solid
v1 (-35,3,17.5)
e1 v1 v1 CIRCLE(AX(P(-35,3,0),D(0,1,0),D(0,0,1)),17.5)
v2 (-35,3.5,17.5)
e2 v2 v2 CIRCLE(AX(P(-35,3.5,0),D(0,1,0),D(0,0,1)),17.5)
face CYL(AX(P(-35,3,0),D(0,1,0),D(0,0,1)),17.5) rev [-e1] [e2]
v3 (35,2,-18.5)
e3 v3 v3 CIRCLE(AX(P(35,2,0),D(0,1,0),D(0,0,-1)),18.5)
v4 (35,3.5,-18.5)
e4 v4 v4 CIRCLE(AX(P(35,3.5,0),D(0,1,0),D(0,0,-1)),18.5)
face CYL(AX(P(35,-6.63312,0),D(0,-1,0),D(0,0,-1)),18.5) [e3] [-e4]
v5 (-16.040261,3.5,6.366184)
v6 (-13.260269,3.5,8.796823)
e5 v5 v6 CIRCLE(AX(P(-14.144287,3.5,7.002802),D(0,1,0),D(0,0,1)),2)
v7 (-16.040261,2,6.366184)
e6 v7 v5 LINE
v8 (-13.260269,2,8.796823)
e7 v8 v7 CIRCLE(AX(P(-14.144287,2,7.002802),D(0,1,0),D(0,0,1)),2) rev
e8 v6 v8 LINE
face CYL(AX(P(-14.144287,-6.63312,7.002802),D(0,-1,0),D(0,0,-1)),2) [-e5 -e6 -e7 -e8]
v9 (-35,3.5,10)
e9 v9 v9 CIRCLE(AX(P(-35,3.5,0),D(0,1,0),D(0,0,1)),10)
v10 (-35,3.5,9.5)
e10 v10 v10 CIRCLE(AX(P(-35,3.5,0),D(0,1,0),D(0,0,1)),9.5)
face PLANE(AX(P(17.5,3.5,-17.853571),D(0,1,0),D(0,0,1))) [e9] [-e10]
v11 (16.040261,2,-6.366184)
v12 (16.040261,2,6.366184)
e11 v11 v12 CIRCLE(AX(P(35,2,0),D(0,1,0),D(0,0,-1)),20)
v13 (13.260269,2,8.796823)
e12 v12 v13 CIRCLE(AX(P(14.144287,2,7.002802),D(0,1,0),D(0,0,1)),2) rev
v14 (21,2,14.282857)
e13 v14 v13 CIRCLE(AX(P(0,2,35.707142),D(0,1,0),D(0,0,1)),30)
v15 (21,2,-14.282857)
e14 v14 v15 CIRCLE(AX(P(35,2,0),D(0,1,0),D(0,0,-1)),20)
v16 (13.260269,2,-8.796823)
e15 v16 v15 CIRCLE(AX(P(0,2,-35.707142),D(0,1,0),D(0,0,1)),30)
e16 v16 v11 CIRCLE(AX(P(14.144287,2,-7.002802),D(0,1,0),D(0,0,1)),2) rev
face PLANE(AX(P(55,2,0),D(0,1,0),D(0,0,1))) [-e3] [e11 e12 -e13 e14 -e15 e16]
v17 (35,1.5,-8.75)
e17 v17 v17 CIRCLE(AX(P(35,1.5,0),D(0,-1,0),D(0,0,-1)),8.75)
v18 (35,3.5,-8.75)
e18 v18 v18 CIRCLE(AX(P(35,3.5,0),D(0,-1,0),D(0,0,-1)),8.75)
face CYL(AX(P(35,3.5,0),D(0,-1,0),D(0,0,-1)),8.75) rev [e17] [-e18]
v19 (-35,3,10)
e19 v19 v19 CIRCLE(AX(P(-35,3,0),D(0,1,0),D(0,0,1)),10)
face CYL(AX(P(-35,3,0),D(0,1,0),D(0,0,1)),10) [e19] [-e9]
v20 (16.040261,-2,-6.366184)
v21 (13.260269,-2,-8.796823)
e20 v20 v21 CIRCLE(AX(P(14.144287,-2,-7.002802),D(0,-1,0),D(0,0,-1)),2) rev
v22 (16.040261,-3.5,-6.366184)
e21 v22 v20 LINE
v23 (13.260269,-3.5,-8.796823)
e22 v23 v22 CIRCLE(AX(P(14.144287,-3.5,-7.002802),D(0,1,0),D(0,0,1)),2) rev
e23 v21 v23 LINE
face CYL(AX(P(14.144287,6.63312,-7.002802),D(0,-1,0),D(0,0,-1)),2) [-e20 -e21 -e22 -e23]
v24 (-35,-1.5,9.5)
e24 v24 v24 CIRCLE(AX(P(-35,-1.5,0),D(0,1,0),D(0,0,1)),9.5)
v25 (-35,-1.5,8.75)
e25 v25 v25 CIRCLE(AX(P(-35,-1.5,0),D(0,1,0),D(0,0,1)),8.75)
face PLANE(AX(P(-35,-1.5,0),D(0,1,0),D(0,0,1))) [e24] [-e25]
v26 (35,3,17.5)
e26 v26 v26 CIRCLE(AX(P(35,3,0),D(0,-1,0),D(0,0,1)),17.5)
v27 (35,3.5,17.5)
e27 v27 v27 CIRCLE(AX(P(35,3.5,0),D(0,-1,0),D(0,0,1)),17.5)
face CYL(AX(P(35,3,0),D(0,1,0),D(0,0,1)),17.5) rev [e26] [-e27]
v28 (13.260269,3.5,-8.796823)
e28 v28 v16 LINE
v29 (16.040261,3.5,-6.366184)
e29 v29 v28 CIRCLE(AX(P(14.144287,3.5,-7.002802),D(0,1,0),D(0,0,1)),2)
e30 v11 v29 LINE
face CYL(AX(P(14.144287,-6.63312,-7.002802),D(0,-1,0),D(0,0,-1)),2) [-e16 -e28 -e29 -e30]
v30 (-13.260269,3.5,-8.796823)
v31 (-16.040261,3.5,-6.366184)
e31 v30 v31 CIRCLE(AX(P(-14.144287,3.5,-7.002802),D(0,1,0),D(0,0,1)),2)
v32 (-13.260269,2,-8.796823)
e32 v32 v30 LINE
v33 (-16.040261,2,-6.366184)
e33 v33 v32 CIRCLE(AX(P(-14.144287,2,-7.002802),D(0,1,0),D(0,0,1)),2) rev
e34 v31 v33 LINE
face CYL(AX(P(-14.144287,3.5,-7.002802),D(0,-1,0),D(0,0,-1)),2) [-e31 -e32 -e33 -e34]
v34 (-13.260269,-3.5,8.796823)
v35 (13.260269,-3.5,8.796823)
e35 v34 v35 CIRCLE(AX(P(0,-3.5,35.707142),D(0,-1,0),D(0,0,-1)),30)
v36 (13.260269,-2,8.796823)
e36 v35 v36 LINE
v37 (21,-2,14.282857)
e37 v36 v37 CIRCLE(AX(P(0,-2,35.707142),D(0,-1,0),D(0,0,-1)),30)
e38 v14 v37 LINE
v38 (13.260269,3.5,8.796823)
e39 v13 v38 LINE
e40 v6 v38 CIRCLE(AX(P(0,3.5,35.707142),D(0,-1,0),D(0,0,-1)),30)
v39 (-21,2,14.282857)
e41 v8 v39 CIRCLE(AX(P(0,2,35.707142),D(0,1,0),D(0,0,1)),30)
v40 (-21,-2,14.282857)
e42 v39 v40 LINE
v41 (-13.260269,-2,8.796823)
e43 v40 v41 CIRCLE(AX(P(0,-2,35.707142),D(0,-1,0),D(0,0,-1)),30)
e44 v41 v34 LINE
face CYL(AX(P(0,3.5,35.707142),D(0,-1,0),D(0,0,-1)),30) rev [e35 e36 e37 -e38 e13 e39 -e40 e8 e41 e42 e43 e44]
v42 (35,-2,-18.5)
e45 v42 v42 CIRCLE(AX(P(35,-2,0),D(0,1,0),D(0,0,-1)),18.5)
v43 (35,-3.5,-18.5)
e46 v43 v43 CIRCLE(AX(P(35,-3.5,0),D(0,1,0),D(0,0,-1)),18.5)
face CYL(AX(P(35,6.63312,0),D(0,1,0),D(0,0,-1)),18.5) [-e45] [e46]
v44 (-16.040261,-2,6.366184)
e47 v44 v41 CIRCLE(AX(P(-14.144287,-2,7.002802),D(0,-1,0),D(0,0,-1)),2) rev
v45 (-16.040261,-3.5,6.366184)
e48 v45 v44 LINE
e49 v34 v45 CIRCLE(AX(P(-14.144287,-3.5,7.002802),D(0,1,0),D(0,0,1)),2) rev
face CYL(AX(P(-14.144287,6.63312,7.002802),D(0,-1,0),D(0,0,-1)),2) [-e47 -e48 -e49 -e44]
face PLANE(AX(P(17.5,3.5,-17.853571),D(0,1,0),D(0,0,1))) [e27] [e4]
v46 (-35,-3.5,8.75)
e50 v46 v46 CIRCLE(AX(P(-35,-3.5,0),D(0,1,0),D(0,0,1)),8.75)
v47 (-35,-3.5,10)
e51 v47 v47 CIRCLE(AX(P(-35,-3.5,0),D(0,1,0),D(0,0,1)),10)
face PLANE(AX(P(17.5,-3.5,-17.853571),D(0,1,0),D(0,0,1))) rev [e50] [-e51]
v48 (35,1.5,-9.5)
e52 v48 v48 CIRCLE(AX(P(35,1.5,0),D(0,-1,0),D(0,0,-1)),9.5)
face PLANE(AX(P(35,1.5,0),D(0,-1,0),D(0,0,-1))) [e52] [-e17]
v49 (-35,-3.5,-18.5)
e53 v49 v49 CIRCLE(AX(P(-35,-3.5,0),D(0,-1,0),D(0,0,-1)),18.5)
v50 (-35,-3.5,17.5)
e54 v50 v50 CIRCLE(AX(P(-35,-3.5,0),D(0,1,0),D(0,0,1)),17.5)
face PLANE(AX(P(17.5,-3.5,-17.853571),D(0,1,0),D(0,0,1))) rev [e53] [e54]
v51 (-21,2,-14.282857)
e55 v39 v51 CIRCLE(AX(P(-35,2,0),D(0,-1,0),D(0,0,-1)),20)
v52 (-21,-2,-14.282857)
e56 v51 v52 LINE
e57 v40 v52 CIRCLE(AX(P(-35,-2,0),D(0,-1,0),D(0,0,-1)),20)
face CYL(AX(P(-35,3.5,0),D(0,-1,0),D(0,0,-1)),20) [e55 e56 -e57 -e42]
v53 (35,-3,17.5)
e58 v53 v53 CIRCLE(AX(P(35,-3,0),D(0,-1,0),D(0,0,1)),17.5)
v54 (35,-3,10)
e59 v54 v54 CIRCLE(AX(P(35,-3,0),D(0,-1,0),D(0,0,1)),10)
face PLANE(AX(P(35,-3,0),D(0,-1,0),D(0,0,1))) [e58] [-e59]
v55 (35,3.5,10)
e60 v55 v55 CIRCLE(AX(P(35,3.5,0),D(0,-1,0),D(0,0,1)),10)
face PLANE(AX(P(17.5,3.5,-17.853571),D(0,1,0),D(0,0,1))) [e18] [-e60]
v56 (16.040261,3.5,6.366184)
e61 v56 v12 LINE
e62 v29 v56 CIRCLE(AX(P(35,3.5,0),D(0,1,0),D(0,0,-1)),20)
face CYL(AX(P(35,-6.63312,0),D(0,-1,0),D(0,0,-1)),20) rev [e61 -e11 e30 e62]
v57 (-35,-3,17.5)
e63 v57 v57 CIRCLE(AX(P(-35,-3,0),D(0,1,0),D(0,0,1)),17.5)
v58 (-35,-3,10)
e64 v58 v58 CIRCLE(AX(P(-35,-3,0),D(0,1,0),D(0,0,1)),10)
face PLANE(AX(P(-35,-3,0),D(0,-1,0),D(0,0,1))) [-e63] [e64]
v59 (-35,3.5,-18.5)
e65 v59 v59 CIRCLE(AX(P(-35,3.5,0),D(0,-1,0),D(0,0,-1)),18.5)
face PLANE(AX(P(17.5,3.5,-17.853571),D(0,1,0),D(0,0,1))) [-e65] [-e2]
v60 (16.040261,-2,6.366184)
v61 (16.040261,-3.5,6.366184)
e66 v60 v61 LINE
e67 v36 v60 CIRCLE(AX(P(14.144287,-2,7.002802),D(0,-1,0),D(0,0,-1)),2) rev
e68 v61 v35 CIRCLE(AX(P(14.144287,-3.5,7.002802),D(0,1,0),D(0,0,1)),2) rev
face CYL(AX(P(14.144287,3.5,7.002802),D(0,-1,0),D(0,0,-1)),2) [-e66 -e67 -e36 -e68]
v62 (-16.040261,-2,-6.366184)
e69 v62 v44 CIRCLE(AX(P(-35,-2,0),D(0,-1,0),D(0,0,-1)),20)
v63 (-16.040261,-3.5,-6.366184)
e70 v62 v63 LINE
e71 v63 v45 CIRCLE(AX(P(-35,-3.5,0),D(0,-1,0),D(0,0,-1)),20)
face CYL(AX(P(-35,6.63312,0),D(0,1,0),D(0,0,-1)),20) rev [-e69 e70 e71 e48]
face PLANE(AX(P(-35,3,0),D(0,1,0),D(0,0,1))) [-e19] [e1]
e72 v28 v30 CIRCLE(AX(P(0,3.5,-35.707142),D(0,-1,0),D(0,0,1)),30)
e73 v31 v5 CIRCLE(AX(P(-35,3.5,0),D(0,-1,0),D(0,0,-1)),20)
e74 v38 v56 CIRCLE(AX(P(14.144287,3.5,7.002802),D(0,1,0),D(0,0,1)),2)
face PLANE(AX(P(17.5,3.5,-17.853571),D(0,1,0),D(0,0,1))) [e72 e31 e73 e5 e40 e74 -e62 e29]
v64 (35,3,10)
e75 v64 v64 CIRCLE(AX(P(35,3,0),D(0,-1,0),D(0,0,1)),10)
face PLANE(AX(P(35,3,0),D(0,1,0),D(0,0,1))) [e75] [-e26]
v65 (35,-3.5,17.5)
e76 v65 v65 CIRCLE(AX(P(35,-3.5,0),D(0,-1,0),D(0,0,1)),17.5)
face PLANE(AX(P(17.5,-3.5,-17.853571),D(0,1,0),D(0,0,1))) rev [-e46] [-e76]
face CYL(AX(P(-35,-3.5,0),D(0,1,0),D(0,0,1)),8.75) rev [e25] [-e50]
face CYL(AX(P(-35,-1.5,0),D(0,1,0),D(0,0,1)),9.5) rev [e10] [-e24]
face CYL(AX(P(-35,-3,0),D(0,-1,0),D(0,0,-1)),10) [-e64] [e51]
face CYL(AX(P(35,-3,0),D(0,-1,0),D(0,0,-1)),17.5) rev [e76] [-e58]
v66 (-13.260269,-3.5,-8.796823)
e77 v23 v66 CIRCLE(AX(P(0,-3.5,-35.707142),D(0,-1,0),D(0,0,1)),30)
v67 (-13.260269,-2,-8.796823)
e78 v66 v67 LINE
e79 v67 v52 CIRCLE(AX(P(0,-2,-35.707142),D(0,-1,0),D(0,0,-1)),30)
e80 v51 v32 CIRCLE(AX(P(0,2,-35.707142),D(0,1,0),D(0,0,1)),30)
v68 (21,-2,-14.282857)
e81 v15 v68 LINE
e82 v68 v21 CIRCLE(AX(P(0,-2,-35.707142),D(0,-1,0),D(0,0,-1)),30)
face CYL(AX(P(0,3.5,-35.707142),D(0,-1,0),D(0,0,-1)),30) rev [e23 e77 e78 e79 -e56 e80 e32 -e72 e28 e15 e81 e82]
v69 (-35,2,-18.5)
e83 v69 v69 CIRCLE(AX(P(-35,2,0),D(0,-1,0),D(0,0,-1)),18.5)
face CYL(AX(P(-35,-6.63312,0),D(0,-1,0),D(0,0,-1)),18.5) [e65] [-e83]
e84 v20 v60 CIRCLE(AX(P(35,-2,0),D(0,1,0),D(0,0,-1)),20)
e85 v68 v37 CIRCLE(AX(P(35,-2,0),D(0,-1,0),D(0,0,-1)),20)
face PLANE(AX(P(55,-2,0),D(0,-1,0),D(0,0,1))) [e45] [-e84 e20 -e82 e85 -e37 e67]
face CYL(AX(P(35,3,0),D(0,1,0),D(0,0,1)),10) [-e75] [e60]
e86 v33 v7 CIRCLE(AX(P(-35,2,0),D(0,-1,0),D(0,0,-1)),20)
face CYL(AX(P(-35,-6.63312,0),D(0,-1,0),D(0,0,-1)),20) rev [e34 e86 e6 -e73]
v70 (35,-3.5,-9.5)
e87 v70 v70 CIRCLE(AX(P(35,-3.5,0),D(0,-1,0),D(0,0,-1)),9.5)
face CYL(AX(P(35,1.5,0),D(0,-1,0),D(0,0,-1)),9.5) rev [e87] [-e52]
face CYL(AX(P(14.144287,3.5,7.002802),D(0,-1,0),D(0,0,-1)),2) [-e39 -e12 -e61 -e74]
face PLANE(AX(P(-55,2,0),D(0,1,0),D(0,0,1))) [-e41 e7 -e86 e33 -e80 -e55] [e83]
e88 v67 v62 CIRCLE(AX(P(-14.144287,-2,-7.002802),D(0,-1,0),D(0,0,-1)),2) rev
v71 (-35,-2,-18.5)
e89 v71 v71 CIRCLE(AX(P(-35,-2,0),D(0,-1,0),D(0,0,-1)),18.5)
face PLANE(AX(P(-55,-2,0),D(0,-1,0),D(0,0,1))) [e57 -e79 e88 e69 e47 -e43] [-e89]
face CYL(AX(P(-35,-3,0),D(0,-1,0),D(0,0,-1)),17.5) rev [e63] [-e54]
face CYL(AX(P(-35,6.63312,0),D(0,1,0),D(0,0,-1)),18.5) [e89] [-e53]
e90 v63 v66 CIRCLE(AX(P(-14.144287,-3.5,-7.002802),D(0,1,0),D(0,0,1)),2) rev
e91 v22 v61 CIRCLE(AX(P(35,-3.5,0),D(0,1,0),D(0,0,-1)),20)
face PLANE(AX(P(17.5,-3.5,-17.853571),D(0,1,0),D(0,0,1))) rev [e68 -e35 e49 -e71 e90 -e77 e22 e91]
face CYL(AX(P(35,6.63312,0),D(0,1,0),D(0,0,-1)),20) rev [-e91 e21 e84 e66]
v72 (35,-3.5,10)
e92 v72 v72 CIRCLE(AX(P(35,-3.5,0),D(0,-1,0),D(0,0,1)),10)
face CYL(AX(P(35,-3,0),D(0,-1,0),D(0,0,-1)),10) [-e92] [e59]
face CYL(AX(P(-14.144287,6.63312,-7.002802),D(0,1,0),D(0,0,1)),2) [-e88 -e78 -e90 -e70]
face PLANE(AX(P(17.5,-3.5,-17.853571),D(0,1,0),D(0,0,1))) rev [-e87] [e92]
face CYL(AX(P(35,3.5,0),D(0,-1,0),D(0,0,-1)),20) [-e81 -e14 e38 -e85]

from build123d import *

# Parameters (mm, degrees)
BOSS_EXTRUDE1_DEPTH       = 3.5
SKETCH2_R                 = 9.5
CUT_EXTRUDE1_DEPTH        = 5
SKETCH3_R                 = 8.75
CUT_EXTRUDE2_DEPTH        = 59.736700622
SKETCH4_R                 = 9.5
CUT_EXTRUDE3_DEPTH        = 5
SKETCH5_R                 = 8.75
CUT_EXTRUDE4_DEPTH        = 59.736700622
SKETCH6_R                 = 17.5
SKETCH6_R_2               = 10
CUT_EXTRUDE5_DEPTH        = 0.5
SKETCH7_W                 = 1.5
SKETCH7_H                 = 1.5
FILLET1_START             = 2
FILLET1_DEPTH             = 2
MIRROR2_COPY_1_SKETCH_R   = 17.5
MIRROR2_COPY_1_SKETCH_R_2 = 10
MIRROR2_COPY_1_DEPTH      = 0.5
MIRROR2_COPY_2_SKETCH_W   = 1.5
MIRROR2_COPY_2_SKETCH_H   = 1.5
MIRROR2_START             = 2
MIRROR2_COPY_3_DEPTH      = 2


with BuildPart() as part:
    # Sketch1 → Boss-Extrude1 (new, symmetric)
    with BuildSketch(Plane(origin=(0, 0, 0), x_dir=(1, 0, 0), z_dir=(0, 1, 0))):
        with BuildLine():
            ThreePointArc((-21, 14.282856857), (-55, 0), (-21, -14.282856857))
            ThreePointArc((-21, -14.282856857), (0, -5.707142143), (21, -14.282856857))
            ThreePointArc((21, -14.282856857), (55, 0), (21, 14.282856857))
            ThreePointArc((21, 14.282856857), (0, 5.707142143), (-21, 14.282856857))
        make_face()
    extrude(amount=BOSS_EXTRUDE1_DEPTH, both=True)

    # Sketch2 → Cut-Extrude1 (cut)
    with BuildSketch(Plane(origin=(0, 3.5, 0), x_dir=(1, 0, 0), z_dir=(0, 1, 0))):
        with Locations(Location((-35, 0, 0), (0, 0, 270))):
            Circle(SKETCH2_R)
    extrude(amount=-CUT_EXTRUDE1_DEPTH, mode=Mode.SUBTRACT)

    # Sketch3 → Cut-Extrude2 (cut, through all)
    with BuildSketch(Plane(origin=(0, -1.5, 0), x_dir=(1, 0, 0), z_dir=(0, 1, 0))):
        with Locations(Location((-35, 0, 0), (0, 0, 270))):
            Circle(SKETCH3_R)
    extrude(amount=-CUT_EXTRUDE2_DEPTH, mode=Mode.SUBTRACT)

    # Sketch4 → Cut-Extrude3 (cut)
    with BuildSketch(Plane.XZ.offset(3.5)):
        with Locations(Location((35, 0, 0), (0, 0, 270))):
            Circle(SKETCH4_R)
    extrude(amount=-CUT_EXTRUDE3_DEPTH, mode=Mode.SUBTRACT)

    # Sketch5 → Cut-Extrude4 (cut, through all)
    with BuildSketch(Plane.XZ.offset(-1.5)):
        with Locations(Location((35, 0, 0), (0, 0, 270))):
            Circle(SKETCH5_R)
    extrude(amount=-CUT_EXTRUDE4_DEPTH, mode=Mode.SUBTRACT)

    # Sketch6 → Cut-Extrude5 (cut)
    with BuildSketch(Plane(origin=(0, 3.5, 0), x_dir=(1, 0, 0), z_dir=(0, 1, 0))):
        with Locations(Location((-35, 0, 0), (0, 0, 270))):
            Circle(SKETCH6_R)
        with Locations(Location((-35, 0, 0), (0, 0, 270))):
            Circle(SKETCH6_R_2, mode=Mode.SUBTRACT)
    cut_extrude5 = extrude(amount=-CUT_EXTRUDE5_DEPTH, mode=Mode.SUBTRACT)

    # Sketch7 → Cut-Revolve1 (revolve, cut)
    with BuildSketch(Plane.XY, mode=Mode.PRIVATE) as cut_revolve1_sk:
        with Locations((-54.25, 2.75)):
            Rectangle(SKETCH7_W, SKETCH7_H)
    cut_revolve1 = revolve(cut_revolve1_sk.sketch.rotate(Axis((-35, -6.63312042, 0), (0, 1, 0)), 270), axis=Axis((-35, -6.63312042, 0), (0, 1, 0)), mode=Mode.SUBTRACT)

    # Fillet1: read off the stored shape, not the designer's step
    # Fillet1 outline → Fillet1 (cut)
    with BuildSketch(Plane(origin=(0, 0, 0), x_dir=(1, 0, 0), z_dir=(0, 1, 0)).offset(FILLET1_START)):
        with BuildLine():
            ThreePointArc((-21, -14.282856857), (-17.348361604, -11.231963907), (-13.260269064, -8.796823223))
            ThreePointArc((-13.260269064, -8.796823223), (-15.460727643, -8.508452663), (-16.04026091, -6.366183602))
            ThreePointArc((-16.04026091, -6.366183602), (-18.051415131, -10.618167023), (-21, -14.282856857))
        make_face()
        with BuildLine():
            ThreePointArc((-21, 14.282856857), (-18.051415131, 10.618167023), (-16.04026091, 6.366183602))
            ThreePointArc((-16.04026091, 6.366183602), (-15.460727643, 8.508452663), (-13.260269064, 8.796823223))
            ThreePointArc((-13.260269064, 8.796823223), (-17.348361604, 11.231963907), (-21, 14.282856857))
        make_face()
    fillet1 = extrude(amount=FILLET1_DEPTH, mode=Mode.SUBTRACT)

    # Mirror1: Cut-Extrude5, Cut-Revolve1, Fillet1 across plane
    add(cut_extrude5.mirror(Plane.ZX), mode=Mode.SUBTRACT)
    add(cut_revolve1.mirror(Plane.ZX), mode=Mode.SUBTRACT)
    add(fillet1.mirror(Plane.ZX), mode=Mode.SUBTRACT)

    # Mirror2: Cut-Extrude5, Cut-Revolve1, Fillet1 across plane
    add(cut_extrude5.mirror(Plane(origin=(0, 0, 0), x_dir=(0, 0, 1), z_dir=(1, 0, 0))), mode=Mode.SUBTRACT)
    add(cut_revolve1.mirror(Plane(origin=(0, 0, 0), x_dir=(0, 0, 1), z_dir=(1, 0, 0))), mode=Mode.SUBTRACT)
    add(fillet1.mirror(Plane(origin=(0, 0, 0), x_dir=(0, 0, 1), z_dir=(1, 0, 0))), mode=Mode.SUBTRACT)

    # Mirror2 copy 1 sketch → Mirror2 copy 1 (cut)
    with BuildSketch(Plane(origin=(0, -3.5, 0), x_dir=(-1, 0, 0), z_dir=(0, -1, 0))):
        with Locations(Location((-35, 0, 0), (0, 0, 270))):
            Circle(MIRROR2_COPY_1_SKETCH_R)
        with Locations(Location((-35, 0, 0), (0, 0, 270))):
            Circle(MIRROR2_COPY_1_SKETCH_R_2, mode=Mode.SUBTRACT)
    extrude(amount=-MIRROR2_COPY_1_DEPTH, mode=Mode.SUBTRACT)

    # Mirror2 copy 2 sketch → Mirror2 copy 2 (revolve, cut)
    with BuildSketch(Plane(origin=(0, 0, 0), x_dir=(-1, 0, 0), z_dir=(0, 0, 1))):
        with Locations((-54.25, 2.75)):
            Rectangle(MIRROR2_COPY_2_SKETCH_W, MIRROR2_COPY_2_SKETCH_H)
    revolve(axis=Axis((35, 6.63312042, 0), (0, -1, 0)), mode=Mode.SUBTRACT)

    # Mirror2 copy 3 sketch → Mirror2 copy 3 (cut)
    with BuildSketch(Plane(origin=(0, 0, 0), x_dir=(-1, 0, 0), z_dir=(0, -1, 0)).offset(MIRROR2_START)):
        with BuildLine():
            ThreePointArc((-21, -14.282856857), (-17.348361604, -11.231963907), (-13.260269064, -8.796823223))
            ThreePointArc((-13.260269064, -8.796823223), (-15.460727643, -8.508452663), (-16.04026091, -6.366183602))
            ThreePointArc((-16.04026091, -6.366183602), (-18.051415131, -10.618167023), (-21, -14.282856857))
        make_face()
        with BuildLine():
            ThreePointArc((-21, 14.282856857), (-18.051415131, 10.618167023), (-16.04026091, 6.366183602))
            ThreePointArc((-16.04026091, 6.366183602), (-15.460727643, 8.508452663), (-13.260269064, 8.796823223))
            ThreePointArc((-13.260269064, 8.796823223), (-17.348361604, 11.231963907), (-21, 14.282856857))
        make_face()
    extrude(amount=MIRROR2_COPY_3_DEPTH, mode=Mode.SUBTRACT)


solid = part.part
